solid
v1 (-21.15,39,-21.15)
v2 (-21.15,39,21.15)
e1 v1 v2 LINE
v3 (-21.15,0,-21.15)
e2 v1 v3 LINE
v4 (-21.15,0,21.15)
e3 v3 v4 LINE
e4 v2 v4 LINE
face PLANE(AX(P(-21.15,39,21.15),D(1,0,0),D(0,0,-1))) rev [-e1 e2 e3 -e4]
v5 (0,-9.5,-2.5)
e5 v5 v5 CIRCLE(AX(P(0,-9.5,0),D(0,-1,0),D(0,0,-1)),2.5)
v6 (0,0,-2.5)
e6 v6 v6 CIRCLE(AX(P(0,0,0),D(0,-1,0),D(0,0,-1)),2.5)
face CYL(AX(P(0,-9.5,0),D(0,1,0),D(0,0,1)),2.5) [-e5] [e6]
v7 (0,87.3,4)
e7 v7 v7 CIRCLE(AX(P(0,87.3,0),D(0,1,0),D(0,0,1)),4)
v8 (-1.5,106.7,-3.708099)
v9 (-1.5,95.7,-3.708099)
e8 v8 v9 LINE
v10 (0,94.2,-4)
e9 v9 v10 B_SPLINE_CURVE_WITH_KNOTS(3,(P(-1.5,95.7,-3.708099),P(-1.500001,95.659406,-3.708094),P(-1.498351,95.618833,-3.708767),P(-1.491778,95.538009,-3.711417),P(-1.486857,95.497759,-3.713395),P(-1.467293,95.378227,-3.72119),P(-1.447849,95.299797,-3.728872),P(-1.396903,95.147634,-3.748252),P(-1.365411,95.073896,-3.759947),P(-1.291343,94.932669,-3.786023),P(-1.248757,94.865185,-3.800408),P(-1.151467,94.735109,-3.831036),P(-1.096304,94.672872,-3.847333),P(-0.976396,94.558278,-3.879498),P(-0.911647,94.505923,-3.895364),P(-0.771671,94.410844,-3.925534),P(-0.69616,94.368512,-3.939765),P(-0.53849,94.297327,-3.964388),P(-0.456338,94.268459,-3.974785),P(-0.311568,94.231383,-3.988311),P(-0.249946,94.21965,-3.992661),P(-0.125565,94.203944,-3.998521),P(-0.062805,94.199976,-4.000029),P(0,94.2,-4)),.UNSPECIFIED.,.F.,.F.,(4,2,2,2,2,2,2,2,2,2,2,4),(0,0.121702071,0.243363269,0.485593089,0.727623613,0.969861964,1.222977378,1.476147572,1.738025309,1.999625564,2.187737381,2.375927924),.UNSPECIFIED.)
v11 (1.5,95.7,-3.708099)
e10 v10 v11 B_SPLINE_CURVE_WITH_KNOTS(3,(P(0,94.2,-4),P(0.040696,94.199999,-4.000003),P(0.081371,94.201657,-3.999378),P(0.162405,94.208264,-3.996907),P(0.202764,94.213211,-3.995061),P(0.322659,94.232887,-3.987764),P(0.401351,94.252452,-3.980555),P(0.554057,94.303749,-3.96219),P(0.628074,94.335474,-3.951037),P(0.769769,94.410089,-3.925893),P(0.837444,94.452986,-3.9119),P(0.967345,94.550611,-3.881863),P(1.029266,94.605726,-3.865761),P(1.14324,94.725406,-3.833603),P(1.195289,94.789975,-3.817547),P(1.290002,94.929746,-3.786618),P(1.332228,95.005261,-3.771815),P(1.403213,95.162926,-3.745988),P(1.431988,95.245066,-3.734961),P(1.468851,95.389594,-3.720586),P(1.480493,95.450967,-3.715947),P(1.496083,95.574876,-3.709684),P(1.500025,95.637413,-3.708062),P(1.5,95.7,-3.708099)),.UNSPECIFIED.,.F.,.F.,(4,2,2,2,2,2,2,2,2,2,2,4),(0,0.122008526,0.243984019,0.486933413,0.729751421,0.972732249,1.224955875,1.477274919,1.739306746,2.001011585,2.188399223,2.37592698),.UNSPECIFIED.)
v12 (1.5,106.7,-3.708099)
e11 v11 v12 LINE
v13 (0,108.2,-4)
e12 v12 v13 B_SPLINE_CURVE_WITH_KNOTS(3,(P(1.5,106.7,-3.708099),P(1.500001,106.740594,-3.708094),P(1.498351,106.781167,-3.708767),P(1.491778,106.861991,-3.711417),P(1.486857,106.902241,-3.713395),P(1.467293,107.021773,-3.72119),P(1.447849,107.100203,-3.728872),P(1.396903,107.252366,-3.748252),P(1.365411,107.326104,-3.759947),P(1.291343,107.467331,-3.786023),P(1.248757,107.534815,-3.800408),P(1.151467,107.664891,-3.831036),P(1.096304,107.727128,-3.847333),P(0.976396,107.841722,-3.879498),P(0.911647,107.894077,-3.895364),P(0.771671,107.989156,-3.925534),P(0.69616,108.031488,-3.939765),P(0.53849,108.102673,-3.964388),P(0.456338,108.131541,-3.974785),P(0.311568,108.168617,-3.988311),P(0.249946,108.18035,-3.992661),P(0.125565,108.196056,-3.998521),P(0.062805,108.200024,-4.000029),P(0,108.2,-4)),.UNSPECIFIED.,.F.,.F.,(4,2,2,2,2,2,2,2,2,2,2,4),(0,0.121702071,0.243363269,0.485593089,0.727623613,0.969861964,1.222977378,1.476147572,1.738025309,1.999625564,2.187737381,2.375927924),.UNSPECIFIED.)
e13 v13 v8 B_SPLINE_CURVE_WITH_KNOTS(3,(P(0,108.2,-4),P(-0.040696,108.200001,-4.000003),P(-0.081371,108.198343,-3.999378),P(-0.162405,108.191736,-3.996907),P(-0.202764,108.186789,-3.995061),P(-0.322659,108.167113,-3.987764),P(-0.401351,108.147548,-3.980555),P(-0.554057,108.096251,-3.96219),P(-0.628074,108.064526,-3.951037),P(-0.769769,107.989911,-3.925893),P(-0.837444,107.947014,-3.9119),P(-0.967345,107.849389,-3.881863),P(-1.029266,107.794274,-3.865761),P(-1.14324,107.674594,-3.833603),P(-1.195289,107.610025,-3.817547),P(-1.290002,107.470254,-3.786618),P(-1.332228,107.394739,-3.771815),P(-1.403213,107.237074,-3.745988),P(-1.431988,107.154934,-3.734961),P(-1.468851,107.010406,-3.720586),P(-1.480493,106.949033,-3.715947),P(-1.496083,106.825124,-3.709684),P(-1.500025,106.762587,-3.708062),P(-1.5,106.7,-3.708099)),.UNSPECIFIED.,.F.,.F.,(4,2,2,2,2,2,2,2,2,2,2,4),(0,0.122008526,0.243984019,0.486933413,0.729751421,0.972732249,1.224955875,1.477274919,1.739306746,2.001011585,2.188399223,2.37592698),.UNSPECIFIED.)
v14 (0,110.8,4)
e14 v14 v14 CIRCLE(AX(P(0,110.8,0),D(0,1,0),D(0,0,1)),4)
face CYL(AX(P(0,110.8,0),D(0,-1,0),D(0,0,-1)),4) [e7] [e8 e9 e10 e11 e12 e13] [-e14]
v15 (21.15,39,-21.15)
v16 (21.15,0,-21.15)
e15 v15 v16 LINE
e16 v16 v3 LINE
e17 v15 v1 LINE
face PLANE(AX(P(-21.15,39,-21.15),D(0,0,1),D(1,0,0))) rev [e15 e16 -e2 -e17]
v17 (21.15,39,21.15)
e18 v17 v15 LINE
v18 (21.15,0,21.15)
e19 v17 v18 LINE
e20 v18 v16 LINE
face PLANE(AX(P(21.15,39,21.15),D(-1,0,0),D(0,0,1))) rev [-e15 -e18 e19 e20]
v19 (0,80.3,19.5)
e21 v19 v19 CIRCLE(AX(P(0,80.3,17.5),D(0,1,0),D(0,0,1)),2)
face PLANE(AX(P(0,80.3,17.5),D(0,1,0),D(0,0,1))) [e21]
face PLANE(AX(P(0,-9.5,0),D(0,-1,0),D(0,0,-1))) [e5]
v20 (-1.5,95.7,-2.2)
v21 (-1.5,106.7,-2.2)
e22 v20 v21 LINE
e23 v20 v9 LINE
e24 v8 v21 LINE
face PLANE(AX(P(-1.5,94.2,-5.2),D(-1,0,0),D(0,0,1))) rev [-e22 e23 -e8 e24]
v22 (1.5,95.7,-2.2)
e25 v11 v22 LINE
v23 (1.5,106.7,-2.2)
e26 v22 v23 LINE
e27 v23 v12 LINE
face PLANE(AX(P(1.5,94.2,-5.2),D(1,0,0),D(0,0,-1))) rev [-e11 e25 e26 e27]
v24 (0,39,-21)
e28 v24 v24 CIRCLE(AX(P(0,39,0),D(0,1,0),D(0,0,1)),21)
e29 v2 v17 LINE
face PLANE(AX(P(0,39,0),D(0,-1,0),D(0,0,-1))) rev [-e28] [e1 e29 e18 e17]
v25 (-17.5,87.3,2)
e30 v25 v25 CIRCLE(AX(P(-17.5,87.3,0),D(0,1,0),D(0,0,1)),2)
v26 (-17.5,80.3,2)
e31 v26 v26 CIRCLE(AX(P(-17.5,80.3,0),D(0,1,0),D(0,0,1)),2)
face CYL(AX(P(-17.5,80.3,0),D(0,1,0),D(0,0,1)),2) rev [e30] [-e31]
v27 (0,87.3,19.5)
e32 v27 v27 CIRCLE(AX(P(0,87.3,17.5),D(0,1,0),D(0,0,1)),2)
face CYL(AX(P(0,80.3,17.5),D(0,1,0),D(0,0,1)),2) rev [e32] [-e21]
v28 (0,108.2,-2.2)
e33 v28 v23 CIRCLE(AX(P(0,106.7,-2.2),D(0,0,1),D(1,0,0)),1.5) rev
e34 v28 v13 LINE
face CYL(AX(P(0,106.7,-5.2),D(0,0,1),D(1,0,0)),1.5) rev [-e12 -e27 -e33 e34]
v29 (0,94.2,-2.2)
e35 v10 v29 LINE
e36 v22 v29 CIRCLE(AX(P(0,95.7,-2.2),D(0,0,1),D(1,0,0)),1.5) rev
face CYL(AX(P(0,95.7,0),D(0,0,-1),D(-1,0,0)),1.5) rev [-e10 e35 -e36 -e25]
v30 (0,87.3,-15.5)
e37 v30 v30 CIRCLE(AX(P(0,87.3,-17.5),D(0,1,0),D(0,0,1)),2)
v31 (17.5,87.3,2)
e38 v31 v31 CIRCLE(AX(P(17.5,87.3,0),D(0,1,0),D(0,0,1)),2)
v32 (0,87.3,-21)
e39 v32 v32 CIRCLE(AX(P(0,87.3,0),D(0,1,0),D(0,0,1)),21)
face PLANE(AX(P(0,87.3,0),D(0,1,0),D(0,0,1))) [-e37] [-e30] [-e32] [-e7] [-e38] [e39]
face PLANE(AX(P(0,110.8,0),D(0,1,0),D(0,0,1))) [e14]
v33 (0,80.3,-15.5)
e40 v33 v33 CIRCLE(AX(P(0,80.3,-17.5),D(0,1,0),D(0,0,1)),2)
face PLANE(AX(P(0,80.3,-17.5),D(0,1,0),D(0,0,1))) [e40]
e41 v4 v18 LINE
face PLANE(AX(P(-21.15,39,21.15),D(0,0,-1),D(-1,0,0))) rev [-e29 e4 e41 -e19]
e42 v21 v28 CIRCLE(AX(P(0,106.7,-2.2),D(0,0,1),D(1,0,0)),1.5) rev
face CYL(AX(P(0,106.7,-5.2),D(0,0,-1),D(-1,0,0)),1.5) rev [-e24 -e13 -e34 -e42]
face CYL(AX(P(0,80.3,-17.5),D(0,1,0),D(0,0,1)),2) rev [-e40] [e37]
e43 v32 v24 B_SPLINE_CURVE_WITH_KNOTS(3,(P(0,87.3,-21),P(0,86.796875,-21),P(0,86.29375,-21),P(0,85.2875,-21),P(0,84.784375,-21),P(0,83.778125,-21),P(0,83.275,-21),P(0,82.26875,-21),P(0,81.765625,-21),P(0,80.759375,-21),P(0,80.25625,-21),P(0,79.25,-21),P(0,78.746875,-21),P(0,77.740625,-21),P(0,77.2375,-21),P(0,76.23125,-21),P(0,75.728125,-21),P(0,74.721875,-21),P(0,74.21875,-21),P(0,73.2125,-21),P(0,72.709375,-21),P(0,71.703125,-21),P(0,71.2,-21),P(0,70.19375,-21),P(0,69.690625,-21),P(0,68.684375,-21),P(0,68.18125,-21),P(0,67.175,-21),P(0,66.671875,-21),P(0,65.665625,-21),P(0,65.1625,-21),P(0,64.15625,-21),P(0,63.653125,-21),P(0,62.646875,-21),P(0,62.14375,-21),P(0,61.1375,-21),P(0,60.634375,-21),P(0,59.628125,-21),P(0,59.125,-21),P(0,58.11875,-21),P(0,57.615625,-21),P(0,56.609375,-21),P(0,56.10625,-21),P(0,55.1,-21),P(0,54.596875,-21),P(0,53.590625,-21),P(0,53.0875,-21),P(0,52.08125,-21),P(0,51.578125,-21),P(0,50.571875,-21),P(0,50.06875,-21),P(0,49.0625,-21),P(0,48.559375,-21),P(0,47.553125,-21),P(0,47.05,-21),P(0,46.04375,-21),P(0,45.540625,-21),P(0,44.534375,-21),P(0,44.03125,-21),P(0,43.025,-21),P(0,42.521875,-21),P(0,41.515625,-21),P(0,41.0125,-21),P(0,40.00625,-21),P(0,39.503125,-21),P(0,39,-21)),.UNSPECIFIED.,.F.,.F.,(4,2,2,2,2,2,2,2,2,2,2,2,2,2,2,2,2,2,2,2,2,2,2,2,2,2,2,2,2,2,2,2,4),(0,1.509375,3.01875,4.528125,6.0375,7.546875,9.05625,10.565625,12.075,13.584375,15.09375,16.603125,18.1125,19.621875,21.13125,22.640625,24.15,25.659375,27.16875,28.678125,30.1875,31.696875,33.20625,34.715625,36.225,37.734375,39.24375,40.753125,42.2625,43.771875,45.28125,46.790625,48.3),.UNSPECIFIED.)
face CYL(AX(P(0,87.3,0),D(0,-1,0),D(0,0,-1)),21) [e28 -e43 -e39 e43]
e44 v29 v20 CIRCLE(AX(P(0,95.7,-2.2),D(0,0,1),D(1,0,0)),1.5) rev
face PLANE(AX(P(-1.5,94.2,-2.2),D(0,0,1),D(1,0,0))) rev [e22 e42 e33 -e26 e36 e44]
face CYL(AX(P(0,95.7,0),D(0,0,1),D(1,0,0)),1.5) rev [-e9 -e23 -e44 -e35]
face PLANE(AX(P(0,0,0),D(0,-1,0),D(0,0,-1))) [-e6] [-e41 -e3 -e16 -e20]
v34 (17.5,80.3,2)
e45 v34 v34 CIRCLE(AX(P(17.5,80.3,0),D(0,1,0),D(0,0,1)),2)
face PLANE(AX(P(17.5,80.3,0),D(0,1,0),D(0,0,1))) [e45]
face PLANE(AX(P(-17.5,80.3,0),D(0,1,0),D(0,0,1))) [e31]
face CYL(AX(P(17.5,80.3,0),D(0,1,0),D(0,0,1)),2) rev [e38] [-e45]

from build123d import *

# Parameters (mm, degrees)
SKETCH2_W           = 42.3
SKETCH2_H           = 42.3
BOSS_EXTRUDE1_DEPTH = 39
SKETCH3_R           = 21
BOSS_EXTRUDE2_DEPTH = 48.3
SKETCH4_R           = 4
BOSS_EXTRUDE3_DEPTH = 23.5
SKETCH5_R           = 2.5
BOSS_EXTRUDE4_DEPTH = 9.5
CUT_EXTRUDE1_START  = -2.6
SKETCH6_W           = 3
SKETCH6_H           = 3
CUT_EXTRUDE1_DEPTH  = 14
FILLET1_R           = 1.5
SKETCH7_R           = 2
CUT_EXTRUDE2_DEPTH  = 7


with BuildPart() as part:
    # Sketch2 → Boss-Extrude1 (new body)
    with BuildSketch(Plane(origin=(0, 0, 0), x_dir=(1, 0, 0), z_dir=(0, 1, 0))):
        Rectangle(SKETCH2_W, SKETCH2_H)
    extrude(amount=BOSS_EXTRUDE1_DEPTH)

    # Sketch3 → Boss-Extrude2 (add)
    with BuildSketch(Plane(origin=(0, 39, 0), x_dir=(1, 0, 0), z_dir=(0, 1, 0))):
        with Locations(Location((0, 0, 0), (0, 0, 90))):
            Circle(SKETCH3_R)
    extrude(amount=BOSS_EXTRUDE2_DEPTH)

    # Sketch4 → Boss-Extrude3 (add)
    with BuildSketch(Plane(origin=(0, 87.3, 0), x_dir=(1, 0, 0), z_dir=(0, 1, 0))):
        with Locations(Location((0, 0, 0), (0, 0, 270))):
            Circle(SKETCH4_R)
    extrude(amount=BOSS_EXTRUDE3_DEPTH)

    # Sketch5 → Boss-Extrude4 (add)
    with BuildSketch(Plane.XZ):
        with Locations(Location((0, 0, 0), (0, 0, 270))):
            Circle(SKETCH5_R)
    extrude(amount=BOSS_EXTRUDE4_DEPTH)

    # Sketch6 → Cut-Extrude1 (cut)
    with BuildSketch(Plane(origin=(0, 110.8, 0), x_dir=(1, 0, 0), z_dir=(0, 1, 0)).offset(CUT_EXTRUDE1_START)):
        with Locations((0, 3.7)):
            Rectangle(SKETCH6_W, SKETCH6_H)
    extrude(amount=-CUT_EXTRUDE1_DEPTH, mode=Mode.SUBTRACT)

    # Fillet1
    fillet1_edges = [part.edges().sort_by_distance(p)[0] for p in [
        (1.5, 94.2, -2.954049622),
        (-1.5, 94.2, -2.954049622),
        (1.5, 108.2, -2.954049622),
        (-1.5, 108.2, -2.954049622),
    ]]
    fillet(fillet1_edges, radius=FILLET1_R - 0.0001)  # a hair under: the kernel refuses the full size

    # Sketch7 → Cut-Extrude2 (cut)
    with BuildSketch(Plane(origin=(0, 87.3, 0), x_dir=(1, 0, 0), z_dir=(0, 1, 0))):
        with Locations(Location((0, 17.5, 0), (0, 0, 270))):
            Circle(SKETCH7_R)
        with Locations(Location((17.5, 0, 0), (0, 0, 270))):
            Circle(SKETCH7_R)
        with Locations(Location((0, -17.5, 0), (0, 0, 270))):
            Circle(SKETCH7_R)
        with Locations(Location((-17.5, 0, 0), (0, 0, 270))):
            Circle(SKETCH7_R)
    extrude(amount=-CUT_EXTRUDE2_DEPTH, mode=Mode.SUBTRACT)


solid = part.part
